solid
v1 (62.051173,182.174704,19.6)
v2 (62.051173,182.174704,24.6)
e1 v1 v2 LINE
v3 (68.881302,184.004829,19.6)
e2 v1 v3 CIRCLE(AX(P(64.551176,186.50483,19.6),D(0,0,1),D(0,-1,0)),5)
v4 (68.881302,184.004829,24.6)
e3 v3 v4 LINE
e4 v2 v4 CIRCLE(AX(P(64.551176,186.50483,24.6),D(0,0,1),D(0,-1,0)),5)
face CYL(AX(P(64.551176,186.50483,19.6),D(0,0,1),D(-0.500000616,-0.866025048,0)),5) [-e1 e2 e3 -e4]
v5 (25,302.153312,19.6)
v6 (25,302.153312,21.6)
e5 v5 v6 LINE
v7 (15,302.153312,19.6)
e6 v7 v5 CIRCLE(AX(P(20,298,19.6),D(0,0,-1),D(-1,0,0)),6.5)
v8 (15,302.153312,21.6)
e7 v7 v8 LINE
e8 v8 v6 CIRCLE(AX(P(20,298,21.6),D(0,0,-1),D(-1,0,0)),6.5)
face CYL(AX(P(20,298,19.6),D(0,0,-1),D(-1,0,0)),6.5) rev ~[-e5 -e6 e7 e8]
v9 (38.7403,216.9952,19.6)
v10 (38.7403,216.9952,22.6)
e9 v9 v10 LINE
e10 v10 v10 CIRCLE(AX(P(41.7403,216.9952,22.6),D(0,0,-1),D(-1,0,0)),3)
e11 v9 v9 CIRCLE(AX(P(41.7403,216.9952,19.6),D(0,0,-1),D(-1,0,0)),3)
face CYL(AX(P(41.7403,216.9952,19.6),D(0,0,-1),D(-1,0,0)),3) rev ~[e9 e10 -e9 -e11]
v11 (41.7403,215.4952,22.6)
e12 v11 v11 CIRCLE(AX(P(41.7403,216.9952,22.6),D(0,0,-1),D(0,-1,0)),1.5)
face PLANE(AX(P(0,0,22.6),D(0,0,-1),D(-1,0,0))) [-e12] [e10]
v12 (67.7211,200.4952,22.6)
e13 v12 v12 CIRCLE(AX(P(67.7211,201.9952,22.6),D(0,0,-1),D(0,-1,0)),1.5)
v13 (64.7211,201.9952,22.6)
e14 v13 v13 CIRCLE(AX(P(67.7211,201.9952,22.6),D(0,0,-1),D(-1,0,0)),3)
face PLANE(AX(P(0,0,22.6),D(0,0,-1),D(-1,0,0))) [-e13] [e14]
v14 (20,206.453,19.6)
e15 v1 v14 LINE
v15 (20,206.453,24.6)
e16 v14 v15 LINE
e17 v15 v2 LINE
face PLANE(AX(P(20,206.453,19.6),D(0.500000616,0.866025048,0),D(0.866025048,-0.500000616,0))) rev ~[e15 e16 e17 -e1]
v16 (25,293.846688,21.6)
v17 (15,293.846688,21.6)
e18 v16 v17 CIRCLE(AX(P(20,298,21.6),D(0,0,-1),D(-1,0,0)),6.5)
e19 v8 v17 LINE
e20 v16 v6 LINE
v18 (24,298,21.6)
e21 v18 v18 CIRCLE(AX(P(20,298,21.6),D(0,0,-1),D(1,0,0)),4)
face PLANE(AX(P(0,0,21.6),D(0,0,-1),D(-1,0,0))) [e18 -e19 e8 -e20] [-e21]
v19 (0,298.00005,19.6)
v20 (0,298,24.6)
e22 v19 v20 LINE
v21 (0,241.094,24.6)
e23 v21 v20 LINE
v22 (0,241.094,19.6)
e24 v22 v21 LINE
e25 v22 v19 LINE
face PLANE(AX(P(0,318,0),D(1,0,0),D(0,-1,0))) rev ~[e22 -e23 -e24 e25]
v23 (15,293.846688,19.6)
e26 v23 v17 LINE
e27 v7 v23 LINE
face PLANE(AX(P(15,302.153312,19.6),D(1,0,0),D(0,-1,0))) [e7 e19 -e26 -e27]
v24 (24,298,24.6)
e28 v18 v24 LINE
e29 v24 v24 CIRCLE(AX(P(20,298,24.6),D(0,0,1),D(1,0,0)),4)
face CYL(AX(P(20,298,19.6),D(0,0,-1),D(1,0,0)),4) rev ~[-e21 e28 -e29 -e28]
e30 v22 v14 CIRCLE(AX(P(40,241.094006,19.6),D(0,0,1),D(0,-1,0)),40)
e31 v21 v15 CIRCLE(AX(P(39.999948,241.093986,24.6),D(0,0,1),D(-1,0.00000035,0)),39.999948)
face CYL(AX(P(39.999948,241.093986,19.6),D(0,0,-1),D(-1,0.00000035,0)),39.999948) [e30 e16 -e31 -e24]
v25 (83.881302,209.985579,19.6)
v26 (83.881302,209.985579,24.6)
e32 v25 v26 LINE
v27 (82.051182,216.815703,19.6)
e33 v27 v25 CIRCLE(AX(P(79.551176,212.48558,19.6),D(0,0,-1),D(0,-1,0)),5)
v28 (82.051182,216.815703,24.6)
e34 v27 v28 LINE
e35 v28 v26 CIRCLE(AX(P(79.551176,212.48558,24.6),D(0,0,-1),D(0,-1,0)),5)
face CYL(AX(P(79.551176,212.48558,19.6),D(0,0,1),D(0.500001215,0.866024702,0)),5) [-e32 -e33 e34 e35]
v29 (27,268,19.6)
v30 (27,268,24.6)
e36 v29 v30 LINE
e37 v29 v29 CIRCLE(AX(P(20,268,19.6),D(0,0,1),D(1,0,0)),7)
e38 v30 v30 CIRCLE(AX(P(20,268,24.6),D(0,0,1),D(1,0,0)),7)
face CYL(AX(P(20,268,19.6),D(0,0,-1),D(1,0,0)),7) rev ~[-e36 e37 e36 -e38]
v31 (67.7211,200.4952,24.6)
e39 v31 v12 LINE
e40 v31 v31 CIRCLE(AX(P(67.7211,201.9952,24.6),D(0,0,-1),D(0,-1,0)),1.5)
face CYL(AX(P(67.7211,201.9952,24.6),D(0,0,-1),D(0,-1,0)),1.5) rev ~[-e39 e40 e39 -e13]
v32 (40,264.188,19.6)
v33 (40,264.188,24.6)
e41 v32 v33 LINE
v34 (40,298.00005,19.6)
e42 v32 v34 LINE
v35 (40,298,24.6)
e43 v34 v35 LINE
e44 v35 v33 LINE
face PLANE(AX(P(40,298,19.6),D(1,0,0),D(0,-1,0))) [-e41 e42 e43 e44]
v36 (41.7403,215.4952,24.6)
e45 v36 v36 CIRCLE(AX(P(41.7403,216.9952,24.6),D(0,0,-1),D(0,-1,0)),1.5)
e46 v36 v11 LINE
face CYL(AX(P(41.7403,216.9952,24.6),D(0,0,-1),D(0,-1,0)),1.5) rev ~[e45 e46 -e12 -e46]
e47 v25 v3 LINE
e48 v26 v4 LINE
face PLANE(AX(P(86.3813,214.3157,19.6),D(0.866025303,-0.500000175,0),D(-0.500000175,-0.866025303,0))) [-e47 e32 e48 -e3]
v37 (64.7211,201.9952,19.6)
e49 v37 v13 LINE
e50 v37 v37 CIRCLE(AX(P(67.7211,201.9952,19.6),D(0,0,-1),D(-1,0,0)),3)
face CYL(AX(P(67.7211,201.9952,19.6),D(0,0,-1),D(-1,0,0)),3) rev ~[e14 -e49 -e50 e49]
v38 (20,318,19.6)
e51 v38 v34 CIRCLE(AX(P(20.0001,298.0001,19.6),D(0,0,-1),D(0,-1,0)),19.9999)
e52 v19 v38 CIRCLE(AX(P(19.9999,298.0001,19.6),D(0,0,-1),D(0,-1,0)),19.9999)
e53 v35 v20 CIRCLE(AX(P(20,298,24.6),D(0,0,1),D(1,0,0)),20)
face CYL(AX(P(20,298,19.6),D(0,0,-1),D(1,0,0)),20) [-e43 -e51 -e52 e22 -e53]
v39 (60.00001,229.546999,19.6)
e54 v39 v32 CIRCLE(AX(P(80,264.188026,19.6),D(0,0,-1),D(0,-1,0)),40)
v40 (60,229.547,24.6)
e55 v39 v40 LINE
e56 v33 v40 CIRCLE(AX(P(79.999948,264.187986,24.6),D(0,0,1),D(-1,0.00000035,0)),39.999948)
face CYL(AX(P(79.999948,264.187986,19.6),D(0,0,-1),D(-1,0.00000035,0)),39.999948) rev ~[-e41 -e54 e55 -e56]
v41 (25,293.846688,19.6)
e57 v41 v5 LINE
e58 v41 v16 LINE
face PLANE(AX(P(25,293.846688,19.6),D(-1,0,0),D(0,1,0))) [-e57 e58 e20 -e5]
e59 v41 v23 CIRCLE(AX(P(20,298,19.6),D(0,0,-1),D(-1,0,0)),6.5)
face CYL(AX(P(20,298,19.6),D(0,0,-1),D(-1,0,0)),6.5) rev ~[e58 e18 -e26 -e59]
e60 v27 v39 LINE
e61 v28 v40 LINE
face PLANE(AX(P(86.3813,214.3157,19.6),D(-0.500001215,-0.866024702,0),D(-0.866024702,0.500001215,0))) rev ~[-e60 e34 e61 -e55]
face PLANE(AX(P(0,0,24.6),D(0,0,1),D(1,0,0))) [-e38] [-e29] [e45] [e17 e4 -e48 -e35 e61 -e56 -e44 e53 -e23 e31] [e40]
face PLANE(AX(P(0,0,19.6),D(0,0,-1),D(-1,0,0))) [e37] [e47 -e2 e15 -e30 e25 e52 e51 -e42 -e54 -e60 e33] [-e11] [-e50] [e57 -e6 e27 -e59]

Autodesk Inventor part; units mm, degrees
ref_plane "YZ Plane" through (0, 0, 0) normal (1, 0, 0) x (0, 1, 0)
ref_plane "XZ Plane" through (0, 0, 0) normal (0, 1, 0) x (-1, 0, 0)
ref_plane "XY Plane" through (0, 0, 0) normal (0, 0, 1) x (1, 0, 0)
sketch "スケッチ1" plane through (0, 0, 0) normal (0, 0, 1) x (1, 0, 0)
  line L0 (0, 0) -> (40, 0)
  line L1 (40, 0) -> (40, 318)
  line L2 (40, 318) -> (0, 318)
  line L3 (0, 318) -> (0, 0)
  line L4 (0, 218) -> (112.7627, 152.8964)
  line L5 (112.7627, 152.8964) -> (132.7627, 187.5375)
  line L6 (132.7627, 187.5375) -> (40, 241.094)
  point P0 (40, 218)
  point P1 (40, 194.906)
  point P2 (20, 318)
  point P3 (122.7627, 170.2169)
  point P4 (20, 258)
  dimension "d0" = 40
  dimension "d1" = 318
  dimension "d69" = 40
  dimension "d70" = 60
  dimension "d91" = 20
  dimension "d92" = 100
  dimension "d93" = 180
  dimension "d96" = 20
  dimension "d97" = 60
extrude "押し出し1" add sketch "スケッチ1" along normal blind 19.6 contours L3 L2 L1 L4 | L1 L6 L5 L4
sketch "スケッチ6" plane through (0, 0, 19.6) normal (0, 0, 1) x (1, 0, 0)
  circle A0 centre (20, 268) radius 7
  line L0 (40, 318) -> (0, 318) projected
  line L1 (40, 241.094) -> (40, 318) projected
  circle A1 centre (20, 20) radius 1.2295
  circle A2 centre (20, 10) radius 1.2295
  line L2 (0, 0) -> (40, 0) projected
  circle A3 centre (20, 298) radius 4
  point P0 (20, 318)
  point P1 (40, 190.8114)
  point P2 (30, 0)
  dimension "d42" = 14
  dimension "d44" = 20
  dimension "d45" = 2.459
  dimension "d46" = 2.459
  dimension "d47" = 10
  dimension "d48" = 10
  dimension "d49" = 20
  dimension "d50" = 20
  dimension "d53" = 8
  dimension "d54" = 20
  dimension "d55" = 30
  dimension "d56" = 20
extrude "押し出し4" cut sketch "スケッチ6" against normal through all contours A0 | A3
sketch "スケッチ8" plane through (0, 0, 0) normal (-1, 0, 0) x (0, 0, 1)
  line L0 (0, 318) -> (19.6, 318) projected
  line L1 (5, 318) -> (14.6, 318)
  line L2 (14.6, 318) -> (14.6, 278)
  line L3 (14.6, 278) -> (5, 278)
  line L4 (5, 278) -> (5, 318)
  line L5 (0, 318) -> (0, 0) projected
  dimension "d57" = 5
  dimension "d58" = 9.6
  dimension "d59" = 40
  dimension "d98" = 19.6
extrude "押し出し5" cut sketch "スケッチ8" against normal through all
fillet "フィレット1" radius 20 4 edges at (40, 318, 17.1) (40, 318, 2.5) (0, 318, 2.5) (0, 318, 17.1)
fillet "フィレット2" radius 40 2 edges at (0, 218, 9.8) (40, 241.094, 9.8)
sketch "スケッチ9" plane through (0, 0, 19.6) normal (0, 0, 1) x (1, 0, 0)
  line L0 (20, 206.453) -> (112.7627, 152.8964) projected
  line L1 (132.7627, 187.5375) -> (60, 229.547) projected
  line L2 (112.7627, 152.8964) -> (132.7627, 187.5375) projected
  line L3 (132.7627, 187.5375) -> (112.7627, 152.8964)
  line L4 (66.3813, 179.6747) -> (112.7627, 152.8964)
  line L5 (132.7627, 187.5375) -> (166.773, 167.9016)
  line L6 (115.1204, 126.9801) -> (133.5174, 158.8446)
  line L7 (141.7531, 173.1092) -> (128.7627, 180.6092)
  line L8 (112.7627, 152.8964) -> (20, 206.453)
  line L9 (132.7627, 187.5375) -> (60, 229.547)
  line L10 (115.1204, 126.9801) -> (125.7531, 145.3964)
  line L11 (133.5174, 158.8446) -> (145.7531, 180.0375)
  line L12 (116.7627, 159.8246) -> (129.7531, 152.3246)
  line L13 (66.3813, 179.6747) -> (129.7531, 152.3246)
  line L14 (66.3813, 179.6747) -> (86.3813, 214.3157)
  line L15 (86.3813, 214.3157) -> (141.7531, 173.1092)
  point P0 (0, 0)
  point P1 (254.4532, 80.329)
  point P2 (128.7627, 180.6092)
  point P3 (123.2579, 156.0746)
  point P4 (86.3813, 214.3157)
  point P5 (40, 194.906)
  point P6 (115.8875, 158.3088)
  point P7 (129.6379, 182.1251)
  dimension "d80" = 24
  dimension "d81" = 40
  dimension "d83" = 15
  dimension "d84" = 8
  dimension "d90" = 24
extrude "押し出し6" cut sketch "スケッチ9" against normal through all contours L13 L2 L0 | L1 L2 L15
sketch "スケッチ11" plane through (104.9897, 139.4332, 24) normal (0.8660254, -0.5, 0) x (0, 0, -1)
  line L0 (4.4, 21.7957) -> (4.4, 49.2964) projected
  line L1 (24, 21.7957) -> (24, 49.2964) projected
  line L2 (0, 24) -> (24, 24)
  line L3 (24, 24) -> (24, 0)
  line L4 (24, 0) -> (0, 0)
  line L5 (0, 0) -> (0, 24)
  line L6 (17, 17) -> (7, 17)
  line L7 (7, 17) -> (7, 7)
  line L8 (7, 7) -> (17, 7)
  line L9 (17, 7) -> (17, 17)
  line L10 (4.4, 35.546) -> (24, 35.546) projected
  circle A0 centre (14.2, 35.546) radius 5
  point P0 (24, -173.2475)
  point P1 (24, 24)
  point P2 (0, 15.546)
  point P3 (24, 15.546)
  dimension "d85" = 10
  dimension "d88" = 10
extrude "押し出し7" add sketch "スケッチ11" along normal blind 15 contours A0 L10 | L10 A0
fillet "フィレット4" radius 20 2 edges at (0, 278, 9.8) (40, 278, 9.8)
sketch "スケッチ12" plane through (0, 0, 19.6) normal (0, 0, 1) x (1, 0, 0)
  line L0 (0, 340.2847) -> (40, 340.2847)
  line L1 (40, 340.2847) -> (40, 181.2581)
  line L2 (40, 181.2581) -> (0, 181.2581)
  line L3 (0, 181.2581) -> (0, 340.2847)
  line L4 (40, 264.188) -> (40, 298) projected
  arc A0 (40, 298) -> (0, 298) centre (20, 298) ccw
  arc A1 (40, 264.188) -> (60, 229.547) centre (80, 264.188) ccw projected
  line L5 (60, 229.547) -> (40, 194.906)
  line L6 (20, 206.453) -> (66.3813, 179.6747) projected
  arc A2 (0, 241.094) -> (20, 206.453) centre (40, 241.094) ccw projected
  arc A3 (0, 241.094) -> (20, 206.453) centre (40, 241.094) ccw
  line L7 (20, 206.453) -> (40, 194.906)
  line L8 (86.3813, 214.3157) -> (60, 229.547) projected
  line L9 (60, 229.547) -> (86.3813, 214.3157)
  line L10 (86.3813, 214.3157) -> (66.3813, 179.6747)
  line L11 (40, 194.906) -> (66.3813, 179.6747)
  circle A4 centre (20, 298) radius 4
  circle A5 centre (20, 268) radius 7 projected
  circle A6 centre (20, 268) radius 4
  point P0 (0, 0)
  dimension "d99" = 40
  dimension "d100" = 40
extrude "押し出し8" add sketch "スケッチ12" along normal blind 5 contours A0 L1 L6 A2 L3 | A1 L5 L1 | L5 L8 L10 L6
sketch "スケッチ13" plane through (0, 0, 0) normal (0, 0, -1) x (-1, 0, 0)
  line L0 (-253.843, 397.4333) -> (123.9074, 397.4333)
  line L1 (123.9074, 397.4333) -> (123.9074, 95.9261)
  line L2 (123.9074, 95.9261) -> (-253.843, 95.9261)
  line L3 (-253.843, 95.9261) -> (-253.843, 397.4333)
  point P0 (0, 0)
extrude "押し出し9" cut sketch "スケッチ13" against normal blind 19.6
sketch "スケッチ14" plane through (0, 0, 24.6) normal (0, 0, 1) x (1, 0, 0)
  line L0 (20, 206.453) -> (66.3813, 179.6747) projected
  line L1 (66.3813, 179.6747) -> (86.3813, 214.3157) projected
  line L2 (41.7403, 216.9952) -> (76.3813, 196.9952)
  point P0 (0, 0)
  point P1 (67.7211, 201.9952)
  dimension "d105" = 20
  dimension "d106" = 20
  dimension "d107" = 30
  dimension "d108" = 10
hole "穴3" at (41.7403, 216.9952, 24.6) at (67.7211, 201.9952, 24.6) direction (0, 0, -1) diameter 3 end through all
fillet "フィレット5" radius 5 2 edges at (86.3813, 214.3157, 22.1) (66.3813, 179.6747, 22.1)
sketch "スケッチ16" plane through (0, 0, 19.6) normal (0, 0, -1) x (-1, 0, 0)
  circle A0 centre (-67.7211, 201.9952) radius 1.5 projected
  circle A1 centre (-67.7211, 201.9952) radius 3
  circle A2 centre (-41.7403, 216.9952) radius 1.5 projected
  circle A3 centre (-41.7403, 216.9952) radius 3
  point P0 (0, 0)
  dimension "d121" = 6
  dimension "d122" = 6
extrude "押し出し11" cut sketch "スケッチ16" against normal blind 3 contours A0 | A1 | A2 | A3
sketch "スケッチ17" plane through (0, 0, 19.6) normal (0, 0, -1) x (-1, 0, 0)
  circle A0 centre (-20, 298) radius 4 projected
  circle A1 centre (-20, 298) radius 6.5
  line L0 (-25, 306.9818) -> (-15, 306.9818)
  line L1 (-15, 306.9818) -> (-15, 289.1648)
  line L2 (-15, 289.1648) -> (-25, 289.1648)
  line L3 (-25, 289.1648) -> (-25, 306.9818)
  point P0 (0, 0)
  point P1 (-25, 302.1533)
  point P2 (-25, 293.8467)
  point P3 (-15, 293.8467)
  point P4 (-15, 302.1533)
  dimension "d125" = 13
  dimension "d126" = 5
  dimension "d127" = 10
extrude "押し出し12" cut sketch "スケッチ17" against normal blind 2 contours L1 A1 L3
equation "\"d45\" = d46"
equation "\"d48\" = d47"
equation "\"d50\" = d49"
equation "\"d106\" = d105"
properties part number "BR_parts_06(3)" material "アルミニウム 6061"
